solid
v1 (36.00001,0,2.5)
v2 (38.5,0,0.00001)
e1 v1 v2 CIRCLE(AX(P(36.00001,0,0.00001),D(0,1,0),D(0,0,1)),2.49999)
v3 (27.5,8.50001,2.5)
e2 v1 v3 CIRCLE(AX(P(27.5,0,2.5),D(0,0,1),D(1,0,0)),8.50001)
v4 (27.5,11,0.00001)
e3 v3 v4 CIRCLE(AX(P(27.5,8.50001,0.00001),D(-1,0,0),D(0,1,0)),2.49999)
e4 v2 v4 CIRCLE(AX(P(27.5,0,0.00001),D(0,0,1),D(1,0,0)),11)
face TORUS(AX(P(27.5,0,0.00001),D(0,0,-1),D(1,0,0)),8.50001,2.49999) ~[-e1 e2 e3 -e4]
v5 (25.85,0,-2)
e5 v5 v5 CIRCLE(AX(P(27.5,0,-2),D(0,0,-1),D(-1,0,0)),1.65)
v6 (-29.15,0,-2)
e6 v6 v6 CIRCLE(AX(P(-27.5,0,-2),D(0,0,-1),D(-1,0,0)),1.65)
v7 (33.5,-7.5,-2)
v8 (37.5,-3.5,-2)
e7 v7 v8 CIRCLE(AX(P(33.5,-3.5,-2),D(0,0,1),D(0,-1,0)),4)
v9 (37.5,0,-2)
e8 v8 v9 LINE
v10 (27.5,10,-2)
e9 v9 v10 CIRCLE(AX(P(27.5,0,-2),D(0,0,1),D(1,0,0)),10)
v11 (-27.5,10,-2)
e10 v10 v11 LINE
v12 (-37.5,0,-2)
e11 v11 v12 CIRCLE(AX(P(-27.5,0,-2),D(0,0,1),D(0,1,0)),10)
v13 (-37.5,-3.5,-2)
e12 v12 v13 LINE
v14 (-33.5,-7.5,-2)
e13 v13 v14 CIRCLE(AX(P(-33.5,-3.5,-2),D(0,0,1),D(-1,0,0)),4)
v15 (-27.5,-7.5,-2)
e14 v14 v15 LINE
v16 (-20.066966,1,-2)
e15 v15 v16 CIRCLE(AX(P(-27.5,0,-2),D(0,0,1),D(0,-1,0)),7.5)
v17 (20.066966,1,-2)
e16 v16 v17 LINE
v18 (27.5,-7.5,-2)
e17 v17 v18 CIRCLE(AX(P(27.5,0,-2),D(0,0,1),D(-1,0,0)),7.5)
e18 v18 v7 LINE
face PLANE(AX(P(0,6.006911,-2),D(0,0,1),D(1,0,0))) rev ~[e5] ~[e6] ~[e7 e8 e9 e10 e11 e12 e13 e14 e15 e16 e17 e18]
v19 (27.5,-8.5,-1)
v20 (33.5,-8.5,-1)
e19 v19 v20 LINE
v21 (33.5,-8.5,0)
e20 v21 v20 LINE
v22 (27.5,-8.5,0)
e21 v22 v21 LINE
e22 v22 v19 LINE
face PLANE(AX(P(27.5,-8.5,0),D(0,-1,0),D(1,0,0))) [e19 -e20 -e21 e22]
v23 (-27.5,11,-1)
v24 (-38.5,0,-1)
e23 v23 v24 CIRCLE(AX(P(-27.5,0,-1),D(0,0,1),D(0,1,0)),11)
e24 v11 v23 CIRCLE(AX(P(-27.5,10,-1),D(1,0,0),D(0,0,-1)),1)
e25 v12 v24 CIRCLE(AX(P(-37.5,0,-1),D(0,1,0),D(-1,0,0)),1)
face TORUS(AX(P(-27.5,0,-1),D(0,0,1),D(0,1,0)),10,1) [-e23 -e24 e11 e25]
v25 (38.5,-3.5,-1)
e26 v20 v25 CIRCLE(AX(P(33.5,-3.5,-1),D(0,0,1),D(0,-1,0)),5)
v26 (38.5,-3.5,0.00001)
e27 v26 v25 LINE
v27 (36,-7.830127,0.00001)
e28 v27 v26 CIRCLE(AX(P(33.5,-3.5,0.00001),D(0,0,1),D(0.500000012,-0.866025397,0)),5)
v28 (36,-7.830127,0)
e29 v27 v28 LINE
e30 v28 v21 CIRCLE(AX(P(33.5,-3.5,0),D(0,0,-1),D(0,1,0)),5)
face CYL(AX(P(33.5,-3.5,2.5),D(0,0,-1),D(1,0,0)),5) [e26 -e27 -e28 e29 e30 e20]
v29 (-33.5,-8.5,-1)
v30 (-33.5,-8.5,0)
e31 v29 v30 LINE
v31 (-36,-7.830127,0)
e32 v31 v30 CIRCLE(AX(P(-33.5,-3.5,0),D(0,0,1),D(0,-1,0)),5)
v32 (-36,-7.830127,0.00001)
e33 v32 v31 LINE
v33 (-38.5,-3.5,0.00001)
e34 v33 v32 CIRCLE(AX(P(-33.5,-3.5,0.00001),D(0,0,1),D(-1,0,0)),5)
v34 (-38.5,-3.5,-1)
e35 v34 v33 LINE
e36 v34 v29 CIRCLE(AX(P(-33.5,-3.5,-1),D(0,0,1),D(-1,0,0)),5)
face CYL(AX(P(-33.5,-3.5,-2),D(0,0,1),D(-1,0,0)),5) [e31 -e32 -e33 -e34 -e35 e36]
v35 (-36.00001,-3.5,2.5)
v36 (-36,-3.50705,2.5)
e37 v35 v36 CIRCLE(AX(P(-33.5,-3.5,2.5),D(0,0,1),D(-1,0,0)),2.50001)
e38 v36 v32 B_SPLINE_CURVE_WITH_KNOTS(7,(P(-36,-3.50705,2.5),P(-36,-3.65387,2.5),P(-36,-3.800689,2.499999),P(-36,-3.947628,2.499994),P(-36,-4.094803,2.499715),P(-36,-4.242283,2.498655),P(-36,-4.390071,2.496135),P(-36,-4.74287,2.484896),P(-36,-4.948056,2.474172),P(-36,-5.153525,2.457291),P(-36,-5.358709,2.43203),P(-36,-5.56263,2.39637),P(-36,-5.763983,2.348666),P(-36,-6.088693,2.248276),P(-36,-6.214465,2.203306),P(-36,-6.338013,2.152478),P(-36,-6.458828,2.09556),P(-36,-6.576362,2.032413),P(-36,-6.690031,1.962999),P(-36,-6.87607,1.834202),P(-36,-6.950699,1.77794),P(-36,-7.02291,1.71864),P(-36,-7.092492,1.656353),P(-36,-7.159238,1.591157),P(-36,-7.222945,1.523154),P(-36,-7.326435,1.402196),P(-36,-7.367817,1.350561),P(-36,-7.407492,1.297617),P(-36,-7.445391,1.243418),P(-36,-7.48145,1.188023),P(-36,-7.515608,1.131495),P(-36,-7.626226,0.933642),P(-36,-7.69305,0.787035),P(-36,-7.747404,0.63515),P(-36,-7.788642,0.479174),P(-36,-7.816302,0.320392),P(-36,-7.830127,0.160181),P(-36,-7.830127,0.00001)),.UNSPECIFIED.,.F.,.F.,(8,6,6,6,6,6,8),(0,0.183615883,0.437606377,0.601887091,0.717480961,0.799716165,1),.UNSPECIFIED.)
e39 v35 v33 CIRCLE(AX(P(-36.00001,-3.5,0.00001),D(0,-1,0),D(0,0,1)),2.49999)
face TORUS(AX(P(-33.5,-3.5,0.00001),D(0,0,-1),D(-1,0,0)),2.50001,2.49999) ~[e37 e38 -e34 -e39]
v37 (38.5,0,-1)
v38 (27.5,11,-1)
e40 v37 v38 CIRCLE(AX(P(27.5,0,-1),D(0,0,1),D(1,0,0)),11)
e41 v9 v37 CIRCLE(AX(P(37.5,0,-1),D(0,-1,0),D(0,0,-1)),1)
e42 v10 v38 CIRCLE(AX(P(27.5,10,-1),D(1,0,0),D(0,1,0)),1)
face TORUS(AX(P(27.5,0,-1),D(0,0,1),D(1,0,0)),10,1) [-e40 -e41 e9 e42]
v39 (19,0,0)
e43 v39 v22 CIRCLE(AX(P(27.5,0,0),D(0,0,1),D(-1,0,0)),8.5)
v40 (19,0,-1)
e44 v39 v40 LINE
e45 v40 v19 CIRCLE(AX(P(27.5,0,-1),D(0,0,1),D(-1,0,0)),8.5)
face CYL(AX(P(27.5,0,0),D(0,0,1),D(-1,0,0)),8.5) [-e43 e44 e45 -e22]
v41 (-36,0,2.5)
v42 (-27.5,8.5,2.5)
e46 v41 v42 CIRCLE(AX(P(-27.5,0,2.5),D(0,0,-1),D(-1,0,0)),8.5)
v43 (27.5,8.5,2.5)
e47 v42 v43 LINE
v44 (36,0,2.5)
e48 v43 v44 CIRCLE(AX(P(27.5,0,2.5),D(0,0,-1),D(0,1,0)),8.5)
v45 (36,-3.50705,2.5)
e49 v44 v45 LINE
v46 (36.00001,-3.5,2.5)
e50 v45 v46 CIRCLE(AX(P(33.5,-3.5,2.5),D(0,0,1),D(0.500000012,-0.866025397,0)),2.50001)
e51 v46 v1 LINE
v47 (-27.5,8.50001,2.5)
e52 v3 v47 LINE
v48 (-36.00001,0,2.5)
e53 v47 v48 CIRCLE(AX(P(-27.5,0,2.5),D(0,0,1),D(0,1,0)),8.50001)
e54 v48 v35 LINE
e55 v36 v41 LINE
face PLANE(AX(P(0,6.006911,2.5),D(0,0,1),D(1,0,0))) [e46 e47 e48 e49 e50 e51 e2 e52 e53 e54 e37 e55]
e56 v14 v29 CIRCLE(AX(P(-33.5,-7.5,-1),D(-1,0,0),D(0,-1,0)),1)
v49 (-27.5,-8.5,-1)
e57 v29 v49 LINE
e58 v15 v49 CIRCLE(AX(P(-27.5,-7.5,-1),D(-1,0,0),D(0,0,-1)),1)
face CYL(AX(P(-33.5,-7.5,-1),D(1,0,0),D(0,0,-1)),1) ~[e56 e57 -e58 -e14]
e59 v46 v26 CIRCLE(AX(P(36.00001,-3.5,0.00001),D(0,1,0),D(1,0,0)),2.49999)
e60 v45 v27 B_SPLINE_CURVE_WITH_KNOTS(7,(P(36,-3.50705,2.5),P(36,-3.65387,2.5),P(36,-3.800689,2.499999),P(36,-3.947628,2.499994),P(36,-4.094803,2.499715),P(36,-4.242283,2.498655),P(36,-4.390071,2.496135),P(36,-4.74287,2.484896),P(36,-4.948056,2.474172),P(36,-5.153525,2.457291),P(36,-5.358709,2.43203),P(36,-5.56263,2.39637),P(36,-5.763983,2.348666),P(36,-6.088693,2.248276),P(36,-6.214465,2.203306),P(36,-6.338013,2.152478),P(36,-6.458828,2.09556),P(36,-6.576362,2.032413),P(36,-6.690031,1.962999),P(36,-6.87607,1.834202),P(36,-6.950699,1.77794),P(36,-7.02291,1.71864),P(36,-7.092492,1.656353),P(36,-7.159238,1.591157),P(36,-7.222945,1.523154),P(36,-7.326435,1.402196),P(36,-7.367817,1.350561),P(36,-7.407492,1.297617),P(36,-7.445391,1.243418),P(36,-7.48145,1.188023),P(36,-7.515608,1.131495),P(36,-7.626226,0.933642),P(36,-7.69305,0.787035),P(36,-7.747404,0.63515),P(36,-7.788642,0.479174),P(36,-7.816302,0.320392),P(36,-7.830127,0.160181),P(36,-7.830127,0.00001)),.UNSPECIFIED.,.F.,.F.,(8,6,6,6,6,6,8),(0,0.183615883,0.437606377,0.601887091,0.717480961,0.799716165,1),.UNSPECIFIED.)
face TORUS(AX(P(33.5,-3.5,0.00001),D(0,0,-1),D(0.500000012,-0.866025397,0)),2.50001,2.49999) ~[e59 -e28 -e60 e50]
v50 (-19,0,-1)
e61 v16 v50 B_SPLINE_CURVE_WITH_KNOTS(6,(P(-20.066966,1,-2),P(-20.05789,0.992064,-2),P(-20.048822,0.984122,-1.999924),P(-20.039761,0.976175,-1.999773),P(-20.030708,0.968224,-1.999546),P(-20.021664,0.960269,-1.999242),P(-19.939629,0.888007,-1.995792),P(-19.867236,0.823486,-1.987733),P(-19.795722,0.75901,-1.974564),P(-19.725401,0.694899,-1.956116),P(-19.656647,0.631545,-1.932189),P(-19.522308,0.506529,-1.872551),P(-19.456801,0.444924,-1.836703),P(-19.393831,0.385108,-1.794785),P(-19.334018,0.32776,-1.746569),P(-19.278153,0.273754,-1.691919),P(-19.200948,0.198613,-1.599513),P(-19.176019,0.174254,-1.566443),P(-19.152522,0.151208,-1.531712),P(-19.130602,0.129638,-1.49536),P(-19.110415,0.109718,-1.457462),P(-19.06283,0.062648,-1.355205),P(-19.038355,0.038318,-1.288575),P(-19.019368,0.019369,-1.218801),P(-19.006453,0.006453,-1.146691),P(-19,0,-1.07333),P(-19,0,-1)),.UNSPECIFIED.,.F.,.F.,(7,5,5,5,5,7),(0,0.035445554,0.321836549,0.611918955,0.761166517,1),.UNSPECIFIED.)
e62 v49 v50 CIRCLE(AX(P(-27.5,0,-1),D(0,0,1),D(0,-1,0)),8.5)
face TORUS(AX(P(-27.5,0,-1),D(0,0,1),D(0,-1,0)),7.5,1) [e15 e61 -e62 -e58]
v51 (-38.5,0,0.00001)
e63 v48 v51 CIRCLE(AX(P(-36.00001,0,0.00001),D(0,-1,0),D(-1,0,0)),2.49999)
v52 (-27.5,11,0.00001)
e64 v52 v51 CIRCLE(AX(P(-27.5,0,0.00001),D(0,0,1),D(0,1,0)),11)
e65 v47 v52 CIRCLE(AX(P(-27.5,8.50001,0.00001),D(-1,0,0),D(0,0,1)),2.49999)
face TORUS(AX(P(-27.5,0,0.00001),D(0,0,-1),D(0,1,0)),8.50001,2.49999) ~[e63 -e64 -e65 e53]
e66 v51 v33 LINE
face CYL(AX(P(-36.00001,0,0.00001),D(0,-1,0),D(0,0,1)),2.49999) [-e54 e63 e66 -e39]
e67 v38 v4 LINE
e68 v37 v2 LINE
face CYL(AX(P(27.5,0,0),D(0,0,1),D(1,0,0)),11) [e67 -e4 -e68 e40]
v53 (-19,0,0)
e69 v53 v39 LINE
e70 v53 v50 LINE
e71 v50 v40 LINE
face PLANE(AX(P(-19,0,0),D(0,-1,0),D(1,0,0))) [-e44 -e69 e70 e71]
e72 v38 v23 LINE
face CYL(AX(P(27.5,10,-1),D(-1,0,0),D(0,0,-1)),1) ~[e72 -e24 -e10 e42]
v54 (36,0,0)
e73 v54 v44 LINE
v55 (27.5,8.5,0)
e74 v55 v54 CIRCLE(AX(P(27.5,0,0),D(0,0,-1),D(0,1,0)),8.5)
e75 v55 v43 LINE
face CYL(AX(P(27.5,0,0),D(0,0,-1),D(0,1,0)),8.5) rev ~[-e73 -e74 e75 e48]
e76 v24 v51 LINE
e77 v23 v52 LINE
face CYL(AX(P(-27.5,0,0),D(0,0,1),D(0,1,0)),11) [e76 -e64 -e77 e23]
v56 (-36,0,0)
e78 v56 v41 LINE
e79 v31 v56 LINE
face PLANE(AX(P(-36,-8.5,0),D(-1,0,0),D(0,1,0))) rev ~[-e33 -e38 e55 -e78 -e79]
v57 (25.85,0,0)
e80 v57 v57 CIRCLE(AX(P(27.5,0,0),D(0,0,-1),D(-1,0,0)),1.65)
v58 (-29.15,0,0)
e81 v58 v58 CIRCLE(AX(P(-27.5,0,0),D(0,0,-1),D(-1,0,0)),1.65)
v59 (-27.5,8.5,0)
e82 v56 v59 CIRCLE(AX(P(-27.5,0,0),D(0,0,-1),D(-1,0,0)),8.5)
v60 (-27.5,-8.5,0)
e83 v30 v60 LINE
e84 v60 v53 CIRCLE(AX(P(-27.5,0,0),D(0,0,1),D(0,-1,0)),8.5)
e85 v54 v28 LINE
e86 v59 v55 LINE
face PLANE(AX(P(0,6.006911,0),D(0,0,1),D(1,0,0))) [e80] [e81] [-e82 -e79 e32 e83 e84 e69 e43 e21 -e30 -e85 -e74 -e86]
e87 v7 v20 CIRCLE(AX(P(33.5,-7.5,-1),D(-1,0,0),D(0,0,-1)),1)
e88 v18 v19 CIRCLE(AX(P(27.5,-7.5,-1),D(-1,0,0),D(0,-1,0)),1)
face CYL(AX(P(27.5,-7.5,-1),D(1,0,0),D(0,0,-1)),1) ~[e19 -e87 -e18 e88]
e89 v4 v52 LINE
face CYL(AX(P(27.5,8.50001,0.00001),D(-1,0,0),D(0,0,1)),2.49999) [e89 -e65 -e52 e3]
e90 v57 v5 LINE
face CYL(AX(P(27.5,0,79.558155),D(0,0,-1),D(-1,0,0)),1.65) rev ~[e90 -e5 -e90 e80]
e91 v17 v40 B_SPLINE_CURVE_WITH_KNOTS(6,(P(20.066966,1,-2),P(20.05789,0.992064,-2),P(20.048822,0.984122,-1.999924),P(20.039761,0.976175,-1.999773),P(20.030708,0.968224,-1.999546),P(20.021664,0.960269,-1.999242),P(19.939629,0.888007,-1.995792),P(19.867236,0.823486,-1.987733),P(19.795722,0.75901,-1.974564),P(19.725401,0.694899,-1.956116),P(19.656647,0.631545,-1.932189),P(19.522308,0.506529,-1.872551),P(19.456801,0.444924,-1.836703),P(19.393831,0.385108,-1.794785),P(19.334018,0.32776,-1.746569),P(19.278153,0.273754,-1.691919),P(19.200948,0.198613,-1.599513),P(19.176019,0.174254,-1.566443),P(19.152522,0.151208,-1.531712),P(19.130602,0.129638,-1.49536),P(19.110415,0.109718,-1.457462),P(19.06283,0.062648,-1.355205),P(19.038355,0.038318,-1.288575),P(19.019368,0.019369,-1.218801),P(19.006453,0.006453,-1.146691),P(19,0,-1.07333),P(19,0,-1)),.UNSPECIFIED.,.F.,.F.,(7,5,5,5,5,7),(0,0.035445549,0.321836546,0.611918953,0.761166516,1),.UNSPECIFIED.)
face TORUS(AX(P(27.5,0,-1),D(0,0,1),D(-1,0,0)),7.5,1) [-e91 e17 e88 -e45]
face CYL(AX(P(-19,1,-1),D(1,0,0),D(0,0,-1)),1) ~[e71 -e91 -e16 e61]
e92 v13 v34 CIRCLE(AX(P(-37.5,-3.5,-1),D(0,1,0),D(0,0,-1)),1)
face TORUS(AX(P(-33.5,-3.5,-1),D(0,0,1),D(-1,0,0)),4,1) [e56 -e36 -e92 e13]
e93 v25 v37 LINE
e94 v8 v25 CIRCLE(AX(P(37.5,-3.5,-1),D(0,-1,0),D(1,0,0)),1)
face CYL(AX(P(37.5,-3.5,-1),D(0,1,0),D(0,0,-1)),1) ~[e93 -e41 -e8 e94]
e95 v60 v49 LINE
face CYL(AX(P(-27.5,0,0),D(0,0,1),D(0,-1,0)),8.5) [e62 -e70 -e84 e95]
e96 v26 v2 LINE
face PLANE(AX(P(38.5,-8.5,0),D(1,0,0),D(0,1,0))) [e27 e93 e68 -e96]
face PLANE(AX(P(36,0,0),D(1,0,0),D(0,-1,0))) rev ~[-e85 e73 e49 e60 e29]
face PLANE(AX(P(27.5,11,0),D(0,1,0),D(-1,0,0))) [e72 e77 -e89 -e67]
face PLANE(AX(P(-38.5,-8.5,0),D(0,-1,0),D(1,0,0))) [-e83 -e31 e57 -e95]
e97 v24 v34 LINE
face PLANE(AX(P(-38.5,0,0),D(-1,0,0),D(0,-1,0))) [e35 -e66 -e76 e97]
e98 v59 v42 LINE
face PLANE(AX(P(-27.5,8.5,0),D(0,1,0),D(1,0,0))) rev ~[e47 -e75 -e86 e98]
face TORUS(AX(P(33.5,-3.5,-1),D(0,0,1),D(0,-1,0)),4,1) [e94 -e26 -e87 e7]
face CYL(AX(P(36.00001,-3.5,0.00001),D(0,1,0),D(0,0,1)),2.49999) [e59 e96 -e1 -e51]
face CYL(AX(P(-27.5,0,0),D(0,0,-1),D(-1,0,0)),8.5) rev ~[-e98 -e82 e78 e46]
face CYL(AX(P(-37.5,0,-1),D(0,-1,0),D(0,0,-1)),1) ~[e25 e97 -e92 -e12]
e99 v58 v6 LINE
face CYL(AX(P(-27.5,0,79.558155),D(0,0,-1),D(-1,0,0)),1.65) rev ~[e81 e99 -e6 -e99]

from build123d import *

# Parameters (mm, degrees)
F1_DEPTH = 2.5
F2_DEPTH = 2
F3_D     = 3.3
F4_R     = 5
F5_R     = 2.49999
F6_R     = 1


# Not quite as in the source:
# - a fillet or chamfer is up to 0.001 mm smaller than in the source, because OpenCascade refuses the exact size


with BuildPart() as f1:
    # F0 (on Top) → F1 (new body)
    with BuildSketch(Plane.XY):
        with BuildLine():
            ThreePointArc((-36, 0), (-33.5104076401, 6.0104076401), (-27.5, 8.5))
            Line((-27.5, 8.5), (27.5, 8.5))
            ThreePointArc((27.5, 8.5), (33.5104076401, 6.0104076401), (36, 0))
            Line((36, 0), (36, -8.5))
            Line((36, -8.5), (38.4999999404, -8.5))
            Line((38.4999999404, -8.5), (38.4999999404, 0))
            ThreePointArc((38.4999999404, 0), (35.2781745509, 7.7781745509), (27.5, 10.9999999404))
            Line((27.5, 10.9999999404), (-27.5, 10.9999999404))
            ThreePointArc((-27.5, 10.9999999404), (-35.2781745509, 7.7781745509), (-38.4999999404, 0))
            Line((-38.4999999404, 0), (-38.4999999404, -8.5))
            Line((-38.4999999404, -8.5), (-36, -8.5))
            Line((-36, -8.5), (-36, 0))
        make_face()
    extrude(amount=F1_DEPTH)

    # F0 (on Top) → F2 (join)
    with BuildSketch(Plane.XY):
        with BuildLine():
            ThreePointArc((-36, 0), (-33.5104076401, 6.0104076401), (-27.5, 8.5))
            Line((-27.5, 8.5), (27.5, 8.5))
            ThreePointArc((27.5, 8.5), (33.5104076401, 6.0104076401), (36, 0))
            Line((36, 0), (36, -8.5))
            Line((36, -8.5), (38.4999999404, -8.5))
            Line((38.4999999404, -8.5), (38.4999999404, 0))
            ThreePointArc((38.4999999404, 0), (35.2781745509, 7.7781745509), (27.5, 10.9999999404))
            Line((27.5, 10.9999999404), (-27.5, 10.9999999404))
            ThreePointArc((-27.5, 10.9999999404), (-35.2781745509, 7.7781745509), (-38.4999999404, 0))
            Line((-38.4999999404, 0), (-38.4999999404, -8.5))
            Line((-38.4999999404, -8.5), (-36, -8.5))
            Line((-36, -8.5), (-36, 0))
        make_face()
        with BuildLine():
            Line((27.5, 8.5), (-27.5, 8.5))
            ThreePointArc((-27.5, 8.5), (-33.5104076401, 6.0104076401), (-36, 0))
            Line((-36, 0), (-36, -8.5))
            Line((-36, -8.5), (-27.5, -8.5))
            ThreePointArc((-27.5, -8.5), (-21.4895923599, -6.0104076401), (-19, 0))
            Line((-19, 0), (19, 0))
            ThreePointArc((19, 0), (21.4895923599, -6.0104076401), (27.5, -8.5))
            Line((27.5, -8.5), (36, -8.5))
            Line((36, -8.5), (36, 0))
            ThreePointArc((36, 0), (33.5104076401, 6.0104076401), (27.5, 8.5))
        make_face()
    extrude(amount=-F2_DEPTH)

    # F3 (through all)
    with Locations(Plane.XY):
        with Locations((27.5, 0), (-27.5, 0)):
            Hole(F3_D / 2)

    # F4
    f4_edges = [f1.edges().sort_by_distance(p)[0] for p in [
        (-38.5, -8.5, 0.25),
        (38.5, -8.5, 0.25),
    ]]
    fillet(f4_edges, radius=F4_R)

    # F5 (radius 2.5 in the source; OpenCascade refuses exactly that, so slightly less here)
    f5_edges = [f1.edges().sort_by_distance(p)[0] for p in [
        (0, 11, 2.5),
    ]]
    fillet(f5_edges, radius=F5_R)

    # F6
    f6_edges = [f1.edges().sort_by_distance(p)[0] for p in [
        (0, 11, -2),
        (0, 0, -2),
    ]]
    fillet(f6_edges, radius=F6_R)


solid = f1.part
